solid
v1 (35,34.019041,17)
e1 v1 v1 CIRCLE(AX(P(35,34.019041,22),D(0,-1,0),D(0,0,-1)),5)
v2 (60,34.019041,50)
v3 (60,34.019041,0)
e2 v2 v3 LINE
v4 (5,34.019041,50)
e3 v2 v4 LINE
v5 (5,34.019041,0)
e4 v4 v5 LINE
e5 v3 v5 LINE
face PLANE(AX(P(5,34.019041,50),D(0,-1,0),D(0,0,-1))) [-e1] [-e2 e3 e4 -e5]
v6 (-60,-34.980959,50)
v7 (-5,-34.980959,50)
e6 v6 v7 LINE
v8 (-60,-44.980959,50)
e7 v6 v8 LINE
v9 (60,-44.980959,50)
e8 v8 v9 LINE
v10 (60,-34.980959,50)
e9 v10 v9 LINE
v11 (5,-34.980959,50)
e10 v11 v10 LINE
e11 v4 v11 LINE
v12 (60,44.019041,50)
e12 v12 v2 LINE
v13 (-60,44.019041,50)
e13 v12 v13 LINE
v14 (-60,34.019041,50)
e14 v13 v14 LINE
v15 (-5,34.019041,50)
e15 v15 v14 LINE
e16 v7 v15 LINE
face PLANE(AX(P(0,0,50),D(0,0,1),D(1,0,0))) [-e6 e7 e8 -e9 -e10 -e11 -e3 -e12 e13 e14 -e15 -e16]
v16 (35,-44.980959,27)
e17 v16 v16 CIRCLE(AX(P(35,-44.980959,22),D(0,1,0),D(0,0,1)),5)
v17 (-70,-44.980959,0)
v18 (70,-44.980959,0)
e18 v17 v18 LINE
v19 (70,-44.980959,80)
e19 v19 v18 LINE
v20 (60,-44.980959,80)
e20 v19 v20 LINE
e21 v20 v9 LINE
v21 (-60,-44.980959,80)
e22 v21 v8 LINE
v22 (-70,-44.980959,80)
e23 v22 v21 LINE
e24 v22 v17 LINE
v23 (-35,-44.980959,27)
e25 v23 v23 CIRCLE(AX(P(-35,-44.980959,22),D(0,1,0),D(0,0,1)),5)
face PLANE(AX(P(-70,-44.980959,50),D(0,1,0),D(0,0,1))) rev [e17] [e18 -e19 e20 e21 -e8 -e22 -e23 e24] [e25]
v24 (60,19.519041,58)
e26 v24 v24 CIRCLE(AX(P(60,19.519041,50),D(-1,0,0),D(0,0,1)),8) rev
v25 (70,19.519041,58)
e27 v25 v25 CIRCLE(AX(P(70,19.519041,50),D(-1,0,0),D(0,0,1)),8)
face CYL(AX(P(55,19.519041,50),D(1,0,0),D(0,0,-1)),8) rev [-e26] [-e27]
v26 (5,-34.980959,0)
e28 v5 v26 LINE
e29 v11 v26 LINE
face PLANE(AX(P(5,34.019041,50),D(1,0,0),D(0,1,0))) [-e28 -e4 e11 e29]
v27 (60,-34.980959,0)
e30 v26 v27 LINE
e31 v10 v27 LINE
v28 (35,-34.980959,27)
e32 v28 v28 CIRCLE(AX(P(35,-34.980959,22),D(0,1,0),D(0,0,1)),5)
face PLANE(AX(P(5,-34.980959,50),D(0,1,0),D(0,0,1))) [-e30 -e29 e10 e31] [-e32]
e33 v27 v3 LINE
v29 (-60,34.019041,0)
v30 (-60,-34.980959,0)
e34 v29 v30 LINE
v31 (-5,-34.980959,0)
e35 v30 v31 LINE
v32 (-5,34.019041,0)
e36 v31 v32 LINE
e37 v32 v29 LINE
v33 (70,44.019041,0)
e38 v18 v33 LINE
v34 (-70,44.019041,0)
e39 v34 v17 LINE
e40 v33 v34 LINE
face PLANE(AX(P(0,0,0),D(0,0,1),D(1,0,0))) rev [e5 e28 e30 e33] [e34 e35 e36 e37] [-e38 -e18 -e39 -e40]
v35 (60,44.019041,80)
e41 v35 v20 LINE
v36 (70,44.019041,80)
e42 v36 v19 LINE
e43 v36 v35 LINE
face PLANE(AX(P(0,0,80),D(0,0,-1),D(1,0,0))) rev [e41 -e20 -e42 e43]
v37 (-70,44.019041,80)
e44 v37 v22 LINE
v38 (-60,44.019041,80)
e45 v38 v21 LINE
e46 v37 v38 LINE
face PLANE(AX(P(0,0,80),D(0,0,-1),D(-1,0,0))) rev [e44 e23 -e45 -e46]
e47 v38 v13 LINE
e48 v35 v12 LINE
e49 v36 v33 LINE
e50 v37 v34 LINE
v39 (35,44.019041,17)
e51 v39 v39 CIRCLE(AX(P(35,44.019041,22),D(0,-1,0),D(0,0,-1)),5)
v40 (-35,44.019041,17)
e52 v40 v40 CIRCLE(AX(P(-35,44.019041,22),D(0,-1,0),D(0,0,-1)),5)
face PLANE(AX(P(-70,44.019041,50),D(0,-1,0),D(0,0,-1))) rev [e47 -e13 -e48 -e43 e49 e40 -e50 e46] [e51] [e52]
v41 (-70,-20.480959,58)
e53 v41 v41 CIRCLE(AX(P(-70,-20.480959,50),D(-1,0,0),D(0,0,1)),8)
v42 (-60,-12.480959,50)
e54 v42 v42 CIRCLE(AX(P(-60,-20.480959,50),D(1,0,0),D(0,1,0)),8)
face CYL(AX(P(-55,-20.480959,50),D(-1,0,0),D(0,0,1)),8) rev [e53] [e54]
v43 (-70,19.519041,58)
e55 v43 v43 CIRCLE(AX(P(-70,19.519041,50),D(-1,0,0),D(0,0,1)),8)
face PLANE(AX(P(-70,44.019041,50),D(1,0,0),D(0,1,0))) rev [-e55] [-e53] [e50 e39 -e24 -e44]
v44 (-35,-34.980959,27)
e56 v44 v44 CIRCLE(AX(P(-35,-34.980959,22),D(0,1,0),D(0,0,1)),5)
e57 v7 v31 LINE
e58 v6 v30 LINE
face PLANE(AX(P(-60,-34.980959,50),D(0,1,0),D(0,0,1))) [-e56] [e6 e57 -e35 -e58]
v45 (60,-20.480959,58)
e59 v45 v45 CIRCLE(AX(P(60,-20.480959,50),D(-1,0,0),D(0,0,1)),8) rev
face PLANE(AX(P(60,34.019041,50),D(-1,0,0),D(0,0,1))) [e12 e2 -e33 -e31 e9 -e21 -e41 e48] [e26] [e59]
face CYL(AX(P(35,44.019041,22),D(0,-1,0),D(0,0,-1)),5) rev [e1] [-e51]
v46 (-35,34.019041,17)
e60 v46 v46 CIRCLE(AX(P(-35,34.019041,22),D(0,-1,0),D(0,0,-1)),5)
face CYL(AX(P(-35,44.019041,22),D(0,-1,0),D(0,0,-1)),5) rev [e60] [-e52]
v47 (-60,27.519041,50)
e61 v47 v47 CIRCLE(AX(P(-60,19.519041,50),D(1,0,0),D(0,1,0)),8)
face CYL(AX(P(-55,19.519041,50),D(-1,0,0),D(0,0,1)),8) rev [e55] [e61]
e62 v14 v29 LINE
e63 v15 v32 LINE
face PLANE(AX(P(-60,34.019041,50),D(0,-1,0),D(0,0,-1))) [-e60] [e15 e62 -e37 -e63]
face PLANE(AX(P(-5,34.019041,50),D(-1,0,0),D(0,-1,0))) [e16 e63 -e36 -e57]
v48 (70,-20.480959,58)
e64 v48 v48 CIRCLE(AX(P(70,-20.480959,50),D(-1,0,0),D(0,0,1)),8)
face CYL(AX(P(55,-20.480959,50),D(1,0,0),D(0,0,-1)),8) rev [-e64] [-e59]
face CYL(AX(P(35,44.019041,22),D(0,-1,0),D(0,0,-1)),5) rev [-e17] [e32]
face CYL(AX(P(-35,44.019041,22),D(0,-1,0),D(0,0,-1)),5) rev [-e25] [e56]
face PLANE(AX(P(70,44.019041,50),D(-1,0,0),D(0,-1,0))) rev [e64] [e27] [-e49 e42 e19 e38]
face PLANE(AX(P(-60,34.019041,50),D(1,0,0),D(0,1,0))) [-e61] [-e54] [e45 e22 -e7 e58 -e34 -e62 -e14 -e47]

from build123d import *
from build123d.topology import SkipClean

# Parameters (mm, degrees)
SKETCH2_W               = 140
SKETCH2_H               = 89
SKETCH2_W_2             = 55
SKETCH2_H_2             = 69
BOSS_EXTRUDE2_DEPTH     = 50
CUT_EXTRUDE1_DEPTH      = 124.778027129
CUT_EXTRUDE1_DEPTH_BACK = 124.778027129
SKETCH3_R               = 5
SKETCH4_R               = 8
CUT_EXTRUDE2_DEPTH      = 15
SKETCH5_W               = 10
SKETCH5_H               = 89
BOSS_EXTRUDE4_DEPTH     = 30
SKETCH4_5_R             = 8
CUT_EXTRUDE5_DEPTH      = 30
MIRROR5_START           = 60
MIRROR5_DEPTH           = 10


# Read off the part's stored shape, not the designer's step: Mirror5
with BuildPart() as part:
    # Sketch2 → Boss-Extrude2 (new body)
    with BuildSketch(Plane.XY):
        with Locations((0, -0.480959067)):
            Rectangle(SKETCH2_W, SKETCH2_H)
        with Locations((32.5, -0.480959067)):
            Rectangle(SKETCH2_W_2, SKETCH2_H_2, mode=Mode.SUBTRACT)
        with Locations((-32.5, -0.480959067)):
            Rectangle(SKETCH2_W_2, SKETCH2_H_2, mode=Mode.SUBTRACT)
    extrude(amount=BOSS_EXTRUDE2_DEPTH)

    # Sketch3 → Cut-Extrude1 (cut, two sides: drawn at the far end of the back side and taken through both)
    with BuildSketch(Plane.XZ.offset(44.980959067).offset(-CUT_EXTRUDE1_DEPTH_BACK)):
        with Locations(Location((-35, 22, 0), (0, 0, 270))):
            Circle(SKETCH3_R)
        with Locations(Location((35, 22, 0), (0, 0, 270))):
            Circle(SKETCH3_R)
    extrude(amount=CUT_EXTRUDE1_DEPTH + CUT_EXTRUDE1_DEPTH_BACK, mode=Mode.SUBTRACT)

    # Sketch4 → Cut-Extrude2 (cut)
    with BuildSketch(Plane.ZY.offset(70)):
        with Locations((50, 19.519040933)):
            Circle(SKETCH4_R)
        with Locations((50, -20.480959067)):
            Circle(SKETCH4_R)
    cut_extrude2 = extrude(amount=-CUT_EXTRUDE2_DEPTH, mode=Mode.SUBTRACT)

    # Mirror1: Cut-Extrude2 across plane
    add(cut_extrude2.mirror(Plane(origin=(0, 0, 0), x_dir=(0, 0, 1), z_dir=(1, 0, 0))), mode=Mode.SUBTRACT)

    # Sketch5 → Boss-Extrude4 (add)
    with BuildSketch(Plane.XY.offset(50)):
        with Locations((-65, -0.480959067)):
            Rectangle(SKETCH5_W, SKETCH5_H)
    extrude(amount=BOSS_EXTRUDE4_DEPTH)

    # Sketch4<5> → Cut-Extrude5 (cut)
    with BuildSketch(Plane.ZY.offset(70)):
        with Locations((50, 19.519040933)):
            Circle(SKETCH4_5_R)
        with Locations((50, -20.480959067)):
            Circle(SKETCH4_5_R)
    extrude(amount=-CUT_EXTRUDE5_DEPTH, mode=Mode.SUBTRACT)

    # Mirror5 outline → Mirror5 (add)
    with SkipClean():  # the faces are left unmerged after this step: merging them gives an invalid solid
        with BuildSketch(Plane.YZ.offset(MIRROR5_START)):
            with BuildLine():
                ThreePointArc((-28.480959067, 50), (-20.480959067, 58), (-12.480959067, 50))
                Line((-12.480959067, 50), (11.519040933, 50))
                ThreePointArc((11.519040933, 50), (19.519040933, 58), (27.519040933, 50))
                Line((27.519040933, 50), (44.019040933, 50))
                Line((44.019040933, 50), (44.019040933, 80))
                Line((44.019040933, 80), (-44.980959067, 80))
                Line((-44.980959067, 80), (-44.980959067, 50))
                Line((-44.980959067, 50), (-28.480959067, 50))
            make_face()
        extrude(amount=MIRROR5_DEPTH)
    add(part.part.scale(1), mode=Mode.REPLACE)  # the faces are merged on a copy


solid = part.part
